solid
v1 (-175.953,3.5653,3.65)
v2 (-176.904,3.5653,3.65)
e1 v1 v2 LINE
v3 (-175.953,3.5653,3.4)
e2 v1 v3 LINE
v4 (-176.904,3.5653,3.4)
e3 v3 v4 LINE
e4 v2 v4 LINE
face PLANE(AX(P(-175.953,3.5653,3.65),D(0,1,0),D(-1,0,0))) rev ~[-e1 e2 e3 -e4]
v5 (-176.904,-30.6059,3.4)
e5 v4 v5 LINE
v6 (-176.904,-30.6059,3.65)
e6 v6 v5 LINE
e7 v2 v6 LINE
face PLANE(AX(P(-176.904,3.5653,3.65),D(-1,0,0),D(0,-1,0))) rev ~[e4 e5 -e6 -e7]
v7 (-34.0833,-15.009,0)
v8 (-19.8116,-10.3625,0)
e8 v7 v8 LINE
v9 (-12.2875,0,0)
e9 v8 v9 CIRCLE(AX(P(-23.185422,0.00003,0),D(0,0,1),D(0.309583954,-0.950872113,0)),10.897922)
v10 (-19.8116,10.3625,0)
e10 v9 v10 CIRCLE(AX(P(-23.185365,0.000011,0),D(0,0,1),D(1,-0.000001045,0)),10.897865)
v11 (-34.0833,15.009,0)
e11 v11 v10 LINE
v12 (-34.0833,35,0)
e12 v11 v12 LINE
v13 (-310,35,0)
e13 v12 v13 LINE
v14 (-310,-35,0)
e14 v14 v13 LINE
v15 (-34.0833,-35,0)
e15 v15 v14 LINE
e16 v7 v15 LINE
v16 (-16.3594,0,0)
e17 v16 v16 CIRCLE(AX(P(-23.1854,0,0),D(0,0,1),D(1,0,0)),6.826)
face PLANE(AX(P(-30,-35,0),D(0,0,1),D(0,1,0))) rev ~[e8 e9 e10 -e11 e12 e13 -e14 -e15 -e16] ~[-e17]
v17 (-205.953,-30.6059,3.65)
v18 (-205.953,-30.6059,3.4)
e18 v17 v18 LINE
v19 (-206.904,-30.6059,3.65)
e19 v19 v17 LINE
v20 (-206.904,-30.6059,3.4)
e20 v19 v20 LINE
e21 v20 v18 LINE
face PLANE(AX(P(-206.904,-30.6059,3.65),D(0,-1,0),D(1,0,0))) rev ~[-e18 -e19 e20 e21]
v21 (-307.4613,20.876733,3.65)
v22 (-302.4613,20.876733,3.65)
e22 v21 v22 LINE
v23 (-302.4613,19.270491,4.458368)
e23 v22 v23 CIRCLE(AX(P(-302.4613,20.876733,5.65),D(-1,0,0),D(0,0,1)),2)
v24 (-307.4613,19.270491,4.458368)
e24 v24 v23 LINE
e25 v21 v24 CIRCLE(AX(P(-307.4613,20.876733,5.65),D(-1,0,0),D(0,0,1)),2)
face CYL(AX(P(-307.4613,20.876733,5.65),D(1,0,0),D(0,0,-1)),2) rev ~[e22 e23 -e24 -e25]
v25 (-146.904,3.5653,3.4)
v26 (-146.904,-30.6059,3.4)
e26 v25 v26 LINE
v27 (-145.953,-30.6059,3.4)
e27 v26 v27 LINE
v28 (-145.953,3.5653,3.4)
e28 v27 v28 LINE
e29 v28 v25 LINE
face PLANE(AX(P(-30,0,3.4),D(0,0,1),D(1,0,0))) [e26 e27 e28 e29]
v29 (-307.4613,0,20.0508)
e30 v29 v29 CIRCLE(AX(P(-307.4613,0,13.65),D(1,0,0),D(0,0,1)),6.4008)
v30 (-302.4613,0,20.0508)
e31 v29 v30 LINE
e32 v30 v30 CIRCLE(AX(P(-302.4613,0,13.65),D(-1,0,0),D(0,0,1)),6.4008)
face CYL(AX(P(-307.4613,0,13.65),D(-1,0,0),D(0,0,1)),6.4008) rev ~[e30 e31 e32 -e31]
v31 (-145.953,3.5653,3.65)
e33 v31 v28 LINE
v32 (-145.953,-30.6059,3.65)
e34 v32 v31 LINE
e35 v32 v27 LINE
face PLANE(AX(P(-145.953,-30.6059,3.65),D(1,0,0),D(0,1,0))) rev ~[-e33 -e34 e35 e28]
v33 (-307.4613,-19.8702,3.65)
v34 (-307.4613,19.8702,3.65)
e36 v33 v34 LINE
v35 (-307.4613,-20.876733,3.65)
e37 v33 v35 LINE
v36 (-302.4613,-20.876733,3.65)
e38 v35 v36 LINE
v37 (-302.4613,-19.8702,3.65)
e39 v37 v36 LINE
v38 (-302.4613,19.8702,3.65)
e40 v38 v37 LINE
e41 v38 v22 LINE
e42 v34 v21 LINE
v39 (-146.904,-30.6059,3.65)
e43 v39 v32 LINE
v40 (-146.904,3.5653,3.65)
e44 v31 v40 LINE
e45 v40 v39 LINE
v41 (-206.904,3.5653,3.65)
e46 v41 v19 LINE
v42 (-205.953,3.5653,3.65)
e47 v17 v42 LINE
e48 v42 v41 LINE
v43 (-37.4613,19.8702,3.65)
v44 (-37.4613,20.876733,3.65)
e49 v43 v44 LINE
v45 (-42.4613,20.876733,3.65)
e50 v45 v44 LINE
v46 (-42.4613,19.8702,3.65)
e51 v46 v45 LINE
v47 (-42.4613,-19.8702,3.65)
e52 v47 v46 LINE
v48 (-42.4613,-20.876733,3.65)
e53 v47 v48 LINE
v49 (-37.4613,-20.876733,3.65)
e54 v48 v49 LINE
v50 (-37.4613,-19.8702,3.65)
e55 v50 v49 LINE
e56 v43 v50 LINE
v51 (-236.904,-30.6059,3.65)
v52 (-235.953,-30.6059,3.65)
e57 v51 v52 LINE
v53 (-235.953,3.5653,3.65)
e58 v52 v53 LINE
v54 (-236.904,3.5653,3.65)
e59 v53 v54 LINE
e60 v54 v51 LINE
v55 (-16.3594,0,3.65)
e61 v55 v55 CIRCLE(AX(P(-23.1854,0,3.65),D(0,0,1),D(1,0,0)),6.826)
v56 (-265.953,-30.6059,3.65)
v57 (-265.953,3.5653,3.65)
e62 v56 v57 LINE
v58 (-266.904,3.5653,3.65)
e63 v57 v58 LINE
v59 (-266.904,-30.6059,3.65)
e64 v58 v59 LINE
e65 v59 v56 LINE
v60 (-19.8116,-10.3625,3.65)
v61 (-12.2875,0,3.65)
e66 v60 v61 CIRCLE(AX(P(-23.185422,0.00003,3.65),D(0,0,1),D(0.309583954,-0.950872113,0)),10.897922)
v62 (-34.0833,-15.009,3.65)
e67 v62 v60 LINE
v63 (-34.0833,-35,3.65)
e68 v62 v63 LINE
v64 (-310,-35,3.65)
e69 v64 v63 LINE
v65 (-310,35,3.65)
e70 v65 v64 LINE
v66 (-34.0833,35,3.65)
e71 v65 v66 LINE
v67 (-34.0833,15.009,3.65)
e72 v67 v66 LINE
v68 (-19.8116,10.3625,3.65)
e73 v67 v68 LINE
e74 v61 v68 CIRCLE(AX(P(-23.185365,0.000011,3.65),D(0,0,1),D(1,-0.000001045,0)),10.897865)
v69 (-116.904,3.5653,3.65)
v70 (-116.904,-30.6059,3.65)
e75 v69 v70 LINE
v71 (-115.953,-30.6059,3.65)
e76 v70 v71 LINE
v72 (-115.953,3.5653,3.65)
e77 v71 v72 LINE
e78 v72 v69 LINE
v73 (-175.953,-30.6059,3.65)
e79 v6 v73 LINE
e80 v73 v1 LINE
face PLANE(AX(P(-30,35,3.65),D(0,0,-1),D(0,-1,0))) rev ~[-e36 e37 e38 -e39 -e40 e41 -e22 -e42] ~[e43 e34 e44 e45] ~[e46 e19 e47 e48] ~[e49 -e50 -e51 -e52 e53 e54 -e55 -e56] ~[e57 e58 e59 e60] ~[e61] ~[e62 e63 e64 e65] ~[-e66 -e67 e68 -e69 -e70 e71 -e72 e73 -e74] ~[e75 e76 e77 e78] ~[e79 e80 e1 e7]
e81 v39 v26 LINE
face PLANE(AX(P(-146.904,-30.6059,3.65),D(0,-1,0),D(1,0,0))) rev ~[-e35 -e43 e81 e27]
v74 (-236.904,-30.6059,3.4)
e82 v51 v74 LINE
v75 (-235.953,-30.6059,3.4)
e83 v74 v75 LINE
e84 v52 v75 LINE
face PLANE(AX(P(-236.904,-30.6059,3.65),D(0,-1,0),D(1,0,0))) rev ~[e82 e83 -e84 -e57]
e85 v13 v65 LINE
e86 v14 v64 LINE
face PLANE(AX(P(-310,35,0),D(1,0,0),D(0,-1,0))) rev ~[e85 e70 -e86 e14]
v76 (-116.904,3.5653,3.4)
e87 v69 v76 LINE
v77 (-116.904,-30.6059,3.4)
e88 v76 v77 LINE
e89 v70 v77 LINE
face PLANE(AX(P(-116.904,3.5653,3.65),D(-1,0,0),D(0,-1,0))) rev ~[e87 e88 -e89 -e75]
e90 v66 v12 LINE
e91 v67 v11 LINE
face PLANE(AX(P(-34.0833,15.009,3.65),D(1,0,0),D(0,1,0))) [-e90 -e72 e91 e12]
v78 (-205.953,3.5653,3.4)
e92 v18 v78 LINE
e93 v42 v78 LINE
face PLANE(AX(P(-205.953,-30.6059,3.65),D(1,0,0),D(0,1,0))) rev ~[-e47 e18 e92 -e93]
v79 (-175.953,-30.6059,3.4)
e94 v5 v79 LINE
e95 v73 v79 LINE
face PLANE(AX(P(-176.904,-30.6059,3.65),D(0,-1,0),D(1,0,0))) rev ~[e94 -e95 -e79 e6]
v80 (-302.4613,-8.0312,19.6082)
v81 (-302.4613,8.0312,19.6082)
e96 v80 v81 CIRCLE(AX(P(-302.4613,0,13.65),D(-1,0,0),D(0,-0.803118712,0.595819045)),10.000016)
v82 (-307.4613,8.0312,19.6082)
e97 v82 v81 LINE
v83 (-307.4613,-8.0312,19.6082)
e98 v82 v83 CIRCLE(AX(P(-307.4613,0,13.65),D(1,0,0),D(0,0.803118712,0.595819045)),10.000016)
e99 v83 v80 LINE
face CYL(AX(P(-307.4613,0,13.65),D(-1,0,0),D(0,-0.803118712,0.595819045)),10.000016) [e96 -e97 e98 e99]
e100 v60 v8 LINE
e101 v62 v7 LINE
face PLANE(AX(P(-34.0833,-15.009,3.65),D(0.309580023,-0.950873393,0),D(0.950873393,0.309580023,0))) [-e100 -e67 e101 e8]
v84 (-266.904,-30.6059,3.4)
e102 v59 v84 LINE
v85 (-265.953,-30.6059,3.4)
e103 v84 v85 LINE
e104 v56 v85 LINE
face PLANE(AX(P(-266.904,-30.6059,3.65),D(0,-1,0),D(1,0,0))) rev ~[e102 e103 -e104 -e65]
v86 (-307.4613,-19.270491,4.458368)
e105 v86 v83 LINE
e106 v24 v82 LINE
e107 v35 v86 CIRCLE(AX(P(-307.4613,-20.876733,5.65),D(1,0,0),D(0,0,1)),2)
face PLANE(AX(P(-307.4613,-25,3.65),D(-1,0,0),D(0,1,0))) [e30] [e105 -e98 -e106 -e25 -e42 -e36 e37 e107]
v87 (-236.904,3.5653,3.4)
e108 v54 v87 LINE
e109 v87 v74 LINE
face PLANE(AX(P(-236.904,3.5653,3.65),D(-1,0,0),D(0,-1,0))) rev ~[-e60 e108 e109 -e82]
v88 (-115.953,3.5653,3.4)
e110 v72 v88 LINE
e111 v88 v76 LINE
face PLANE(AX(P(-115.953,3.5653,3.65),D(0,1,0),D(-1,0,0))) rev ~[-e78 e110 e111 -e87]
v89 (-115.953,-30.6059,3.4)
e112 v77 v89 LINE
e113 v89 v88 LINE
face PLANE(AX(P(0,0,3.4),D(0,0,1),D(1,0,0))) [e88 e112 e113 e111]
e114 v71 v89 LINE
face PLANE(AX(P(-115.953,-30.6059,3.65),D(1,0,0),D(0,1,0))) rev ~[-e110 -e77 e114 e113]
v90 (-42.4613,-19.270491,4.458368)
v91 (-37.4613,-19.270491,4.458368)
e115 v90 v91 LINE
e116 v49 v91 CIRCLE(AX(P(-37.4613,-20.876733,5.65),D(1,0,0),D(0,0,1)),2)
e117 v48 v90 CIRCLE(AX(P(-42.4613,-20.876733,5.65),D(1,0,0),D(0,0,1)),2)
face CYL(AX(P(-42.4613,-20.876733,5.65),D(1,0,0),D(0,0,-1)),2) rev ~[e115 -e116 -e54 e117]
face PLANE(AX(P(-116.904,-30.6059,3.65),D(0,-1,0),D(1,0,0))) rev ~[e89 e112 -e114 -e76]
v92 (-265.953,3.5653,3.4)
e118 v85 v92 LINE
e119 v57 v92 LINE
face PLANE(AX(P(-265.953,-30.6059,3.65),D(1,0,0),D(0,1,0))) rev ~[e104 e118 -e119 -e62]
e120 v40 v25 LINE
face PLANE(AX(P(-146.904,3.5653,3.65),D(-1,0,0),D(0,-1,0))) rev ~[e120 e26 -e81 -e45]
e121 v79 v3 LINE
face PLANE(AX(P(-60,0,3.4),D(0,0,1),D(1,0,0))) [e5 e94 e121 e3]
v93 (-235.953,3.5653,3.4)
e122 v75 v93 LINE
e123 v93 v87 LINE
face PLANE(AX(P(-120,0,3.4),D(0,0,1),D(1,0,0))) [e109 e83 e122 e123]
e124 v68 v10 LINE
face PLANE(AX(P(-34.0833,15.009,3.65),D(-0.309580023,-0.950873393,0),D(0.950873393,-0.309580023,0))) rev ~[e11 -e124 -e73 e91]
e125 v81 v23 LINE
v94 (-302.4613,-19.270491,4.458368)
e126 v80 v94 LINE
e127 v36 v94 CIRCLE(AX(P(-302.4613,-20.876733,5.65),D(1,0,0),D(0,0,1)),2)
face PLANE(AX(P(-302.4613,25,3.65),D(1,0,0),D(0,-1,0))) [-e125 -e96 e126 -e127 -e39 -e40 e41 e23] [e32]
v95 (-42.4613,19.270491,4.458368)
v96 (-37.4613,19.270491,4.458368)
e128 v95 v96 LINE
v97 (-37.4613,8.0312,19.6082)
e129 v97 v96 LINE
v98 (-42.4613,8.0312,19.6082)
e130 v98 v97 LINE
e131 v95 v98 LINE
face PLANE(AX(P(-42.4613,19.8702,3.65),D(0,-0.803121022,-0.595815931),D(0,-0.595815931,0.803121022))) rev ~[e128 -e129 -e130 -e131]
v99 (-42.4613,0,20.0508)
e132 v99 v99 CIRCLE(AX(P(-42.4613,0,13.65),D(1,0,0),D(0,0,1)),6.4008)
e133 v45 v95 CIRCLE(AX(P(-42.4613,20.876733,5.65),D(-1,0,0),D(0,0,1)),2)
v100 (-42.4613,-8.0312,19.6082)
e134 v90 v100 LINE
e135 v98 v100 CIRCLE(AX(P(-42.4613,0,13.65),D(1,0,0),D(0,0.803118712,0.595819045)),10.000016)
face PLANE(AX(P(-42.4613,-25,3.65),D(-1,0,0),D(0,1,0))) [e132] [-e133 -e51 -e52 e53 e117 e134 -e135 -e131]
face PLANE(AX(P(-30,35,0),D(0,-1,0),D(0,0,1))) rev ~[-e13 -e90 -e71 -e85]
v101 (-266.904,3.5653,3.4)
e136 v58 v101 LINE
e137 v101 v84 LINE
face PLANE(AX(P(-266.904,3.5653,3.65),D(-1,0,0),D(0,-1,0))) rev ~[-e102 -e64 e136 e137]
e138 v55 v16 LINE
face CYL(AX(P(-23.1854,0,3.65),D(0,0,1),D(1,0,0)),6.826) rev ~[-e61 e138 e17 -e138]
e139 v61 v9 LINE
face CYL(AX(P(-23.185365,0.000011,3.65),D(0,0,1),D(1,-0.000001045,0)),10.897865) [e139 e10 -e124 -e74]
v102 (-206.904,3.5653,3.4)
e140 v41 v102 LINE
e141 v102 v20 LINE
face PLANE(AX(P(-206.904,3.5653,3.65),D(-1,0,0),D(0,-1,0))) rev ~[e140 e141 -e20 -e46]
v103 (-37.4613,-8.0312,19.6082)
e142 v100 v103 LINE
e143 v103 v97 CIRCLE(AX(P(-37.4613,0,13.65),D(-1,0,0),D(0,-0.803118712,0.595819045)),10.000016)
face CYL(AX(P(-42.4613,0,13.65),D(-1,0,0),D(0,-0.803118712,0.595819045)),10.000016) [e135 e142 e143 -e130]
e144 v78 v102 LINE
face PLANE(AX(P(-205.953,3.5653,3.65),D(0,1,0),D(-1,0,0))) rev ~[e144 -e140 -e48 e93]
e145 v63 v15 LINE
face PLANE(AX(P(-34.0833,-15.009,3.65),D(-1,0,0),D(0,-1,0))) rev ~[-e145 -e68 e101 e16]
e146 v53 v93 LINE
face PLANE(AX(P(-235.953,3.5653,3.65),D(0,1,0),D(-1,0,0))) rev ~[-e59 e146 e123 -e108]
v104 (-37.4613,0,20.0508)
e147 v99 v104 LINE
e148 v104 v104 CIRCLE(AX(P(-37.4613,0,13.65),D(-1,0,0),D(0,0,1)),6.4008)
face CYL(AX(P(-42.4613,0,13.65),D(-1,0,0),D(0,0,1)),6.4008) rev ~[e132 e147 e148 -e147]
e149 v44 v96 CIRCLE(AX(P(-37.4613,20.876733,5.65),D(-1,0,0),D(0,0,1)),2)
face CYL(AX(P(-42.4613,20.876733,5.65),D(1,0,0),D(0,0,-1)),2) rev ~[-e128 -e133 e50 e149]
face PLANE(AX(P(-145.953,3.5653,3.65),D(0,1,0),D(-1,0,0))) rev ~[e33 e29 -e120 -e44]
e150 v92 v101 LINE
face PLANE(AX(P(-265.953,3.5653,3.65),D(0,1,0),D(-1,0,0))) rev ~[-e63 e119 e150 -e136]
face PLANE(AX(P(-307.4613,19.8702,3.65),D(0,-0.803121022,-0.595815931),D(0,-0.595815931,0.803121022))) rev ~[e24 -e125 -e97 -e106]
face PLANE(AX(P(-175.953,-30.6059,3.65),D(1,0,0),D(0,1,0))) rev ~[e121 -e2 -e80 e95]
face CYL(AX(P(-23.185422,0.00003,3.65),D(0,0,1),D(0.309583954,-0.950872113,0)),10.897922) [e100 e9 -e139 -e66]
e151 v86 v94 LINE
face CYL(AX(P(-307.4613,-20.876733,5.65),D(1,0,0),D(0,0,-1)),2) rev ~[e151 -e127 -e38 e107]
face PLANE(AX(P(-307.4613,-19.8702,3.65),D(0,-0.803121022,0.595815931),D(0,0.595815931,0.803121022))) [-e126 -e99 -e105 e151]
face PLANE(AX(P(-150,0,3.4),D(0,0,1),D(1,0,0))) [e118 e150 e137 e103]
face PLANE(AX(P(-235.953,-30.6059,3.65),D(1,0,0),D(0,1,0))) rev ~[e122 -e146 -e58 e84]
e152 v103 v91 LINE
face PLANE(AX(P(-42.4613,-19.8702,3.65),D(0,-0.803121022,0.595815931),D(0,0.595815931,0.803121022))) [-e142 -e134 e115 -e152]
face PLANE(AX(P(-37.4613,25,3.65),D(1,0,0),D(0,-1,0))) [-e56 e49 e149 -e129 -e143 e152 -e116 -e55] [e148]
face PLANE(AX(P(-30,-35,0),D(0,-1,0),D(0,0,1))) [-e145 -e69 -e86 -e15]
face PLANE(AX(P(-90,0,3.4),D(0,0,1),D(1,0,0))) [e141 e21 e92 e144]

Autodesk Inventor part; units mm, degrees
ref_plane "YZ Plane" through (0, 0, 0) normal (1, 0, 0) x (0, 1, 0)
ref_plane "XZ Plane" through (0, 0, 0) normal (0, 1, 0) x (-1, 0, 0)
ref_plane "XY Plane" through (0, 0, 0) normal (0, 0, 1) x (1, 0, 0)
sketch "Sketch1" plane through (0, 0, 0) normal (0, 0, 1) x (1, 0, 0)
  point P0 (0, 0)
sketch "Sketch2" plane through (0, 0, 0) normal (0, 0, 1) x (1, 0, 0)
  line L0 (-30, 35) -> (-310, 35)
  line L1 (-310, 35) -> (-310, -35)
  line L2 (-310, -35) -> (-30, -35)
  line L3 (-30, -35) -> (-30, 35)
  line L4 (-310, 35) -> (-30, -35) construction
  line L5 (-30, 35) -> (-310, -35) construction
  line L6 (0, 0) -> (-620.4685, 0)
  point P0 (-170, 0)
  dimension "d0" = 280
  dimension "d1" = 70
  dimension "d2" = 30
extrude "Extrusion1" add sketch "Sketch2" along normal blind 3.65
sketch "Sketch3" plane through (0, 0, 3.65) normal (0, 0, 1) x (1, 0, 0)
  line L0 (-30, 35) -> (-30, -35) projected
  line L1 (-310, -35) -> (-310, 35) projected
  line L2 (-30, 0) -> (-310, 0) construction
  line L3 (-42.4613, 25) -> (-37.4613, 25)
  line L4 (-37.4613, 25) -> (-37.4613, -25)
  line L5 (-37.4613, -25) -> (-42.4613, -25)
  line L6 (-42.4613, -25) -> (-42.4613, 25)
  line L7 (-37.4613, 25) -> (-42.4613, -25) construction
  line L8 (-42.4613, 25) -> (-37.4613, -25) construction
  point P0 (0, 0)
  point P1 (-39.9613, 0)
  dimension "d5" = 5
  dimension "d6" = 50
extrude "Extrusion2" add sketch "Sketch3" along normal blind 35.4
sketch "Sketch4" plane through (-42.4613, -25, 3.65) normal (-1, 0, 0) x (0, 0, 1)
  line L0 (35.4, 0) -> (35.4, 50) projected
  line L1 (0, 50) -> (35.4, 50) projected
  line L2 (0, 0) -> (0, 50) projected
  line L3 (0, 0) -> (35.4, 0) projected
  circle A0 centre (10, 25) radius 10 construction
  line L4 (35.4, 25) -> (-31.6063, 25)
  line L5 (0, 44.8702) -> (15.9582, 33.0312)
  line L6 (0, 5.1298) -> (15.9582, 16.9688)
  circle A1 centre (10, 25) radius 6.4008
  arc A2 (15.9582, 16.9688) -> (15.9582, 33.0312) centre (10, 25) ccw
  line L7 (0, 60) -> (0, -10) projected
  line L8 (0, 50) -> (35.4, 0) construction
  line L9 (35.4, 50) -> (0, 0) construction
  line L10 (0, -10) -> (0, 60) projected
  point P0 (-3.65, 25)
  point P1 (17.7, 25)
  point P2 (17.7, 25)
  dimension "d9" = 20
extrude "Extrusion3" cut sketch "Sketch4" against normal through all contours L3 L2 L6 A2 L4 L0 | L4 A2 L5 L2 L1 L0 | A1 L4 | L4 A1
pattern_linear "Rectangular Pattern1" count 2 spacing 265 along (-1, 0, 0) of "Extrusion3", "Extrusion2"
sketch "Sketch5" plane through (0, 0, 3.65) normal (0, 0, 1) x (1, 0, 0)
  line L0 (-30, -35) -> (-310, -35) projected
  line L1 (-115.953, 3.5653) -> (-116.904, 3.5653)
  line L2 (-116.904, 3.5653) -> (-116.904, -30.6059)
  line L3 (-116.904, -30.6059) -> (-115.953, -30.6059)
  line L4 (-115.953, -30.6059) -> (-115.953, 3.5653)
  line L5 (-85.953, 3.5653) -> (-86.904, 3.5653)
  line L6 (-86.904, 3.5653) -> (-86.904, -30.6059)
  line L7 (-86.904, -30.6059) -> (-85.953, -30.6059)
  line L8 (-85.953, -30.6059) -> (-85.953, 3.5653)
  line L9 (-55.953, 3.5653) -> (-56.904, 3.5653)
  line L10 (-56.904, 3.5653) -> (-56.904, -30.6059)
  line L11 (-56.904, -30.6059) -> (-55.953, -30.6059)
  line L12 (-55.953, -30.6059) -> (-55.953, 3.5653)
  line L13 (-25.953, 3.5653) -> (-26.904, 3.5653)
  line L14 (-26.904, 3.5653) -> (-26.904, -30.6059)
  line L15 (-26.904, -30.6059) -> (-25.953, -30.6059)
  line L16 (-25.953, -30.6059) -> (-25.953, 3.5653)
  line L17 (4.047, 3.5653) -> (3.096, 3.5653)
  line L18 (3.096, 3.5653) -> (3.096, -30.6059)
  line L19 (3.096, -30.6059) -> (4.047, -30.6059)
  line L20 (4.047, -30.6059) -> (4.047, 3.5653)
  line L21 (34.047, 3.5653) -> (33.096, 3.5653)
  line L22 (33.096, 3.5653) -> (33.096, -30.6059)
  line L23 (33.096, -30.6059) -> (34.047, -30.6059)
  line L24 (34.047, -30.6059) -> (34.047, 3.5653)
  point P0 (0, 0)
  dimension "d17" = 30
extrude "Extrusion4" cut sketch "Sketch5" against normal blind 0.25 contours L4 L3 L2 L1
pattern_linear "Rectangular Pattern2" count 6 spacing 30 along (-1, 0, 0) of "Extrusion4"
sketch "Sketch6" plane through (-30, -35, 0) normal (1, 0, 0) x (0, 0, -1)
  line L0 (-3.65, 70) -> (-3.65, 0) projected
  line L1 (0, 0) -> (-3.65, 0) projected
  line L2 (0, 0) -> (0, 70) projected
  line L3 (0, 70) -> (-3.65, 70) projected
  point P0 (0, 35)
extrude "Extrusion5" add sketch "Sketch6" along normal blind 17.7125
sketch "Sketch7" plane through (0, 0, 3.65) normal (0, 0, 1) x (1, 0, 0)
  line L0 (-266.904, -30.6059) -> (-266.904, 3.5653) projected
  line L1 (-266.904, 3.5653) -> (-265.953, 3.5653) projected
  line L2 (-265.953, 3.5653) -> (-265.953, -30.6059) projected
  line L3 (-265.953, -30.6059) -> (-266.904, -30.6059) projected
  line L4 (-236.904, -30.6059) -> (-236.904, 3.5653) projected
  line L5 (-236.904, 3.5653) -> (-235.953, 3.5653) projected
  line L6 (-235.953, 3.5653) -> (-235.953, -30.6059) projected
  line L7 (-235.953, -30.6059) -> (-236.904, -30.6059) projected
  line L8 (-206.904, -30.6059) -> (-206.904, 3.5653) projected
  line L9 (-206.904, 3.5653) -> (-205.953, 3.5653) projected
  line L10 (-205.953, 3.5653) -> (-205.953, -30.6059) projected
  line L11 (-205.953, -30.6059) -> (-206.904, -30.6059) projected
  line L12 (-176.904, -30.6059) -> (-176.904, 3.5653) projected
  line L13 (-176.904, 3.5653) -> (-175.953, 3.5653) projected
  line L14 (-175.953, 3.5653) -> (-175.953, -30.6059) projected
  line L15 (-175.953, -30.6059) -> (-176.904, -30.6059) projected
  line L16 (-146.904, -30.6059) -> (-146.904, 3.5653) projected
  line L17 (-146.904, 3.5653) -> (-145.953, 3.5653) projected
  line L18 (-145.953, 3.5653) -> (-145.953, -30.6059) projected
  line L19 (-145.953, -30.6059) -> (-146.904, -30.6059) projected
  line L20 (-116.904, -30.6059) -> (-116.904, 3.5653) projected
  line L21 (-116.904, 3.5653) -> (-115.953, 3.5653) projected
  line L22 (-115.953, 3.5653) -> (-115.953, -30.6059) projected
  line L23 (-115.953, -30.6059) -> (-116.904, -30.6059) projected
  line L24 (-302.4613, 19.8702) -> (-302.4613, -19.8702) projected
  line L25 (-307.4613, -19.8702) -> (-302.4613, -19.8702) projected
  line L26 (-307.4613, -19.8702) -> (-307.4613, 19.8702) projected
  line L27 (-307.4613, 19.8702) -> (-302.4613, 19.8702) projected
  line L28 (-310, 35) -> (-12.2875, 35) projected
  line L29 (-310, -35) -> (-310, 35) projected
  line L30 (-12.2875, -35) -> (-310, -35) projected
  line L31 (-12.2875, -35) -> (-12.2875, 35) projected
  line L32 (-42.4613, -19.8702) -> (-42.4613, 19.8702) projected
  line L33 (-42.4613, 19.8702) -> (-37.4613, 19.8702) projected
  line L34 (-37.4613, 19.8702) -> (-37.4613, -19.8702) projected
  line L35 (-42.4613, -19.8702) -> (-37.4613, -19.8702) projected
  line L36 (-12.2875, 35) -> (-12.2875, -35)
  circle A0 centre (-23.1854, 0) radius 10.8979 construction
  line L37 (-12.2875, -35) -> (-12.2875, 35) projected
  line L38 (-34.0833, 15.009) -> (-19.8116, 10.3625)
  line L39 (-34.0833, 15.009) -> (-34.0833, 35)
  line L40 (-12.2875, 35) -> (-12.2875, 0)
  arc A1 (-12.2875, 0) -> (-19.8116, 10.3625) centre (-23.1854, 0) ccw
  line L41 (-310, 0) -> (-198.3644, 0)
  circle A2 centre (-23.1854, 0) radius 10.8979 construction
  line L42 (-34.0833, -15.009) -> (-19.8116, -10.3625)
  line L43 (-34.0833, -15.009) -> (-34.0833, -35)
  arc A3 (-19.8116, -10.3625) -> (-12.2875, 0) centre (-23.1854, 0) ccw
  line L44 (-34.0833, 15.009) -> (-34.0833, 35)
  line L45 (-12.2875, 35) -> (-12.2875, 0)
  line L46 (-12.2875, -35) -> (-34.0833, -35)
  circle A4 centre (-23.1854, 0) radius 6.826
extrude "Extrusion6" cut sketch "Sketch7" against normal through all contours L28 L31 A1 L38 L39 | L31 L30 L43 L42 A3 | A4
fillet "Fillet1" radius 2 4 edges at (-39.9613, -19.8702, 3.65) (-39.9613, 19.8702, 3.65) (-304.9613, -19.8702, 3.65) (-304.9613, 19.8702, 3.65)
properties part number "ForceMeterCasing"
